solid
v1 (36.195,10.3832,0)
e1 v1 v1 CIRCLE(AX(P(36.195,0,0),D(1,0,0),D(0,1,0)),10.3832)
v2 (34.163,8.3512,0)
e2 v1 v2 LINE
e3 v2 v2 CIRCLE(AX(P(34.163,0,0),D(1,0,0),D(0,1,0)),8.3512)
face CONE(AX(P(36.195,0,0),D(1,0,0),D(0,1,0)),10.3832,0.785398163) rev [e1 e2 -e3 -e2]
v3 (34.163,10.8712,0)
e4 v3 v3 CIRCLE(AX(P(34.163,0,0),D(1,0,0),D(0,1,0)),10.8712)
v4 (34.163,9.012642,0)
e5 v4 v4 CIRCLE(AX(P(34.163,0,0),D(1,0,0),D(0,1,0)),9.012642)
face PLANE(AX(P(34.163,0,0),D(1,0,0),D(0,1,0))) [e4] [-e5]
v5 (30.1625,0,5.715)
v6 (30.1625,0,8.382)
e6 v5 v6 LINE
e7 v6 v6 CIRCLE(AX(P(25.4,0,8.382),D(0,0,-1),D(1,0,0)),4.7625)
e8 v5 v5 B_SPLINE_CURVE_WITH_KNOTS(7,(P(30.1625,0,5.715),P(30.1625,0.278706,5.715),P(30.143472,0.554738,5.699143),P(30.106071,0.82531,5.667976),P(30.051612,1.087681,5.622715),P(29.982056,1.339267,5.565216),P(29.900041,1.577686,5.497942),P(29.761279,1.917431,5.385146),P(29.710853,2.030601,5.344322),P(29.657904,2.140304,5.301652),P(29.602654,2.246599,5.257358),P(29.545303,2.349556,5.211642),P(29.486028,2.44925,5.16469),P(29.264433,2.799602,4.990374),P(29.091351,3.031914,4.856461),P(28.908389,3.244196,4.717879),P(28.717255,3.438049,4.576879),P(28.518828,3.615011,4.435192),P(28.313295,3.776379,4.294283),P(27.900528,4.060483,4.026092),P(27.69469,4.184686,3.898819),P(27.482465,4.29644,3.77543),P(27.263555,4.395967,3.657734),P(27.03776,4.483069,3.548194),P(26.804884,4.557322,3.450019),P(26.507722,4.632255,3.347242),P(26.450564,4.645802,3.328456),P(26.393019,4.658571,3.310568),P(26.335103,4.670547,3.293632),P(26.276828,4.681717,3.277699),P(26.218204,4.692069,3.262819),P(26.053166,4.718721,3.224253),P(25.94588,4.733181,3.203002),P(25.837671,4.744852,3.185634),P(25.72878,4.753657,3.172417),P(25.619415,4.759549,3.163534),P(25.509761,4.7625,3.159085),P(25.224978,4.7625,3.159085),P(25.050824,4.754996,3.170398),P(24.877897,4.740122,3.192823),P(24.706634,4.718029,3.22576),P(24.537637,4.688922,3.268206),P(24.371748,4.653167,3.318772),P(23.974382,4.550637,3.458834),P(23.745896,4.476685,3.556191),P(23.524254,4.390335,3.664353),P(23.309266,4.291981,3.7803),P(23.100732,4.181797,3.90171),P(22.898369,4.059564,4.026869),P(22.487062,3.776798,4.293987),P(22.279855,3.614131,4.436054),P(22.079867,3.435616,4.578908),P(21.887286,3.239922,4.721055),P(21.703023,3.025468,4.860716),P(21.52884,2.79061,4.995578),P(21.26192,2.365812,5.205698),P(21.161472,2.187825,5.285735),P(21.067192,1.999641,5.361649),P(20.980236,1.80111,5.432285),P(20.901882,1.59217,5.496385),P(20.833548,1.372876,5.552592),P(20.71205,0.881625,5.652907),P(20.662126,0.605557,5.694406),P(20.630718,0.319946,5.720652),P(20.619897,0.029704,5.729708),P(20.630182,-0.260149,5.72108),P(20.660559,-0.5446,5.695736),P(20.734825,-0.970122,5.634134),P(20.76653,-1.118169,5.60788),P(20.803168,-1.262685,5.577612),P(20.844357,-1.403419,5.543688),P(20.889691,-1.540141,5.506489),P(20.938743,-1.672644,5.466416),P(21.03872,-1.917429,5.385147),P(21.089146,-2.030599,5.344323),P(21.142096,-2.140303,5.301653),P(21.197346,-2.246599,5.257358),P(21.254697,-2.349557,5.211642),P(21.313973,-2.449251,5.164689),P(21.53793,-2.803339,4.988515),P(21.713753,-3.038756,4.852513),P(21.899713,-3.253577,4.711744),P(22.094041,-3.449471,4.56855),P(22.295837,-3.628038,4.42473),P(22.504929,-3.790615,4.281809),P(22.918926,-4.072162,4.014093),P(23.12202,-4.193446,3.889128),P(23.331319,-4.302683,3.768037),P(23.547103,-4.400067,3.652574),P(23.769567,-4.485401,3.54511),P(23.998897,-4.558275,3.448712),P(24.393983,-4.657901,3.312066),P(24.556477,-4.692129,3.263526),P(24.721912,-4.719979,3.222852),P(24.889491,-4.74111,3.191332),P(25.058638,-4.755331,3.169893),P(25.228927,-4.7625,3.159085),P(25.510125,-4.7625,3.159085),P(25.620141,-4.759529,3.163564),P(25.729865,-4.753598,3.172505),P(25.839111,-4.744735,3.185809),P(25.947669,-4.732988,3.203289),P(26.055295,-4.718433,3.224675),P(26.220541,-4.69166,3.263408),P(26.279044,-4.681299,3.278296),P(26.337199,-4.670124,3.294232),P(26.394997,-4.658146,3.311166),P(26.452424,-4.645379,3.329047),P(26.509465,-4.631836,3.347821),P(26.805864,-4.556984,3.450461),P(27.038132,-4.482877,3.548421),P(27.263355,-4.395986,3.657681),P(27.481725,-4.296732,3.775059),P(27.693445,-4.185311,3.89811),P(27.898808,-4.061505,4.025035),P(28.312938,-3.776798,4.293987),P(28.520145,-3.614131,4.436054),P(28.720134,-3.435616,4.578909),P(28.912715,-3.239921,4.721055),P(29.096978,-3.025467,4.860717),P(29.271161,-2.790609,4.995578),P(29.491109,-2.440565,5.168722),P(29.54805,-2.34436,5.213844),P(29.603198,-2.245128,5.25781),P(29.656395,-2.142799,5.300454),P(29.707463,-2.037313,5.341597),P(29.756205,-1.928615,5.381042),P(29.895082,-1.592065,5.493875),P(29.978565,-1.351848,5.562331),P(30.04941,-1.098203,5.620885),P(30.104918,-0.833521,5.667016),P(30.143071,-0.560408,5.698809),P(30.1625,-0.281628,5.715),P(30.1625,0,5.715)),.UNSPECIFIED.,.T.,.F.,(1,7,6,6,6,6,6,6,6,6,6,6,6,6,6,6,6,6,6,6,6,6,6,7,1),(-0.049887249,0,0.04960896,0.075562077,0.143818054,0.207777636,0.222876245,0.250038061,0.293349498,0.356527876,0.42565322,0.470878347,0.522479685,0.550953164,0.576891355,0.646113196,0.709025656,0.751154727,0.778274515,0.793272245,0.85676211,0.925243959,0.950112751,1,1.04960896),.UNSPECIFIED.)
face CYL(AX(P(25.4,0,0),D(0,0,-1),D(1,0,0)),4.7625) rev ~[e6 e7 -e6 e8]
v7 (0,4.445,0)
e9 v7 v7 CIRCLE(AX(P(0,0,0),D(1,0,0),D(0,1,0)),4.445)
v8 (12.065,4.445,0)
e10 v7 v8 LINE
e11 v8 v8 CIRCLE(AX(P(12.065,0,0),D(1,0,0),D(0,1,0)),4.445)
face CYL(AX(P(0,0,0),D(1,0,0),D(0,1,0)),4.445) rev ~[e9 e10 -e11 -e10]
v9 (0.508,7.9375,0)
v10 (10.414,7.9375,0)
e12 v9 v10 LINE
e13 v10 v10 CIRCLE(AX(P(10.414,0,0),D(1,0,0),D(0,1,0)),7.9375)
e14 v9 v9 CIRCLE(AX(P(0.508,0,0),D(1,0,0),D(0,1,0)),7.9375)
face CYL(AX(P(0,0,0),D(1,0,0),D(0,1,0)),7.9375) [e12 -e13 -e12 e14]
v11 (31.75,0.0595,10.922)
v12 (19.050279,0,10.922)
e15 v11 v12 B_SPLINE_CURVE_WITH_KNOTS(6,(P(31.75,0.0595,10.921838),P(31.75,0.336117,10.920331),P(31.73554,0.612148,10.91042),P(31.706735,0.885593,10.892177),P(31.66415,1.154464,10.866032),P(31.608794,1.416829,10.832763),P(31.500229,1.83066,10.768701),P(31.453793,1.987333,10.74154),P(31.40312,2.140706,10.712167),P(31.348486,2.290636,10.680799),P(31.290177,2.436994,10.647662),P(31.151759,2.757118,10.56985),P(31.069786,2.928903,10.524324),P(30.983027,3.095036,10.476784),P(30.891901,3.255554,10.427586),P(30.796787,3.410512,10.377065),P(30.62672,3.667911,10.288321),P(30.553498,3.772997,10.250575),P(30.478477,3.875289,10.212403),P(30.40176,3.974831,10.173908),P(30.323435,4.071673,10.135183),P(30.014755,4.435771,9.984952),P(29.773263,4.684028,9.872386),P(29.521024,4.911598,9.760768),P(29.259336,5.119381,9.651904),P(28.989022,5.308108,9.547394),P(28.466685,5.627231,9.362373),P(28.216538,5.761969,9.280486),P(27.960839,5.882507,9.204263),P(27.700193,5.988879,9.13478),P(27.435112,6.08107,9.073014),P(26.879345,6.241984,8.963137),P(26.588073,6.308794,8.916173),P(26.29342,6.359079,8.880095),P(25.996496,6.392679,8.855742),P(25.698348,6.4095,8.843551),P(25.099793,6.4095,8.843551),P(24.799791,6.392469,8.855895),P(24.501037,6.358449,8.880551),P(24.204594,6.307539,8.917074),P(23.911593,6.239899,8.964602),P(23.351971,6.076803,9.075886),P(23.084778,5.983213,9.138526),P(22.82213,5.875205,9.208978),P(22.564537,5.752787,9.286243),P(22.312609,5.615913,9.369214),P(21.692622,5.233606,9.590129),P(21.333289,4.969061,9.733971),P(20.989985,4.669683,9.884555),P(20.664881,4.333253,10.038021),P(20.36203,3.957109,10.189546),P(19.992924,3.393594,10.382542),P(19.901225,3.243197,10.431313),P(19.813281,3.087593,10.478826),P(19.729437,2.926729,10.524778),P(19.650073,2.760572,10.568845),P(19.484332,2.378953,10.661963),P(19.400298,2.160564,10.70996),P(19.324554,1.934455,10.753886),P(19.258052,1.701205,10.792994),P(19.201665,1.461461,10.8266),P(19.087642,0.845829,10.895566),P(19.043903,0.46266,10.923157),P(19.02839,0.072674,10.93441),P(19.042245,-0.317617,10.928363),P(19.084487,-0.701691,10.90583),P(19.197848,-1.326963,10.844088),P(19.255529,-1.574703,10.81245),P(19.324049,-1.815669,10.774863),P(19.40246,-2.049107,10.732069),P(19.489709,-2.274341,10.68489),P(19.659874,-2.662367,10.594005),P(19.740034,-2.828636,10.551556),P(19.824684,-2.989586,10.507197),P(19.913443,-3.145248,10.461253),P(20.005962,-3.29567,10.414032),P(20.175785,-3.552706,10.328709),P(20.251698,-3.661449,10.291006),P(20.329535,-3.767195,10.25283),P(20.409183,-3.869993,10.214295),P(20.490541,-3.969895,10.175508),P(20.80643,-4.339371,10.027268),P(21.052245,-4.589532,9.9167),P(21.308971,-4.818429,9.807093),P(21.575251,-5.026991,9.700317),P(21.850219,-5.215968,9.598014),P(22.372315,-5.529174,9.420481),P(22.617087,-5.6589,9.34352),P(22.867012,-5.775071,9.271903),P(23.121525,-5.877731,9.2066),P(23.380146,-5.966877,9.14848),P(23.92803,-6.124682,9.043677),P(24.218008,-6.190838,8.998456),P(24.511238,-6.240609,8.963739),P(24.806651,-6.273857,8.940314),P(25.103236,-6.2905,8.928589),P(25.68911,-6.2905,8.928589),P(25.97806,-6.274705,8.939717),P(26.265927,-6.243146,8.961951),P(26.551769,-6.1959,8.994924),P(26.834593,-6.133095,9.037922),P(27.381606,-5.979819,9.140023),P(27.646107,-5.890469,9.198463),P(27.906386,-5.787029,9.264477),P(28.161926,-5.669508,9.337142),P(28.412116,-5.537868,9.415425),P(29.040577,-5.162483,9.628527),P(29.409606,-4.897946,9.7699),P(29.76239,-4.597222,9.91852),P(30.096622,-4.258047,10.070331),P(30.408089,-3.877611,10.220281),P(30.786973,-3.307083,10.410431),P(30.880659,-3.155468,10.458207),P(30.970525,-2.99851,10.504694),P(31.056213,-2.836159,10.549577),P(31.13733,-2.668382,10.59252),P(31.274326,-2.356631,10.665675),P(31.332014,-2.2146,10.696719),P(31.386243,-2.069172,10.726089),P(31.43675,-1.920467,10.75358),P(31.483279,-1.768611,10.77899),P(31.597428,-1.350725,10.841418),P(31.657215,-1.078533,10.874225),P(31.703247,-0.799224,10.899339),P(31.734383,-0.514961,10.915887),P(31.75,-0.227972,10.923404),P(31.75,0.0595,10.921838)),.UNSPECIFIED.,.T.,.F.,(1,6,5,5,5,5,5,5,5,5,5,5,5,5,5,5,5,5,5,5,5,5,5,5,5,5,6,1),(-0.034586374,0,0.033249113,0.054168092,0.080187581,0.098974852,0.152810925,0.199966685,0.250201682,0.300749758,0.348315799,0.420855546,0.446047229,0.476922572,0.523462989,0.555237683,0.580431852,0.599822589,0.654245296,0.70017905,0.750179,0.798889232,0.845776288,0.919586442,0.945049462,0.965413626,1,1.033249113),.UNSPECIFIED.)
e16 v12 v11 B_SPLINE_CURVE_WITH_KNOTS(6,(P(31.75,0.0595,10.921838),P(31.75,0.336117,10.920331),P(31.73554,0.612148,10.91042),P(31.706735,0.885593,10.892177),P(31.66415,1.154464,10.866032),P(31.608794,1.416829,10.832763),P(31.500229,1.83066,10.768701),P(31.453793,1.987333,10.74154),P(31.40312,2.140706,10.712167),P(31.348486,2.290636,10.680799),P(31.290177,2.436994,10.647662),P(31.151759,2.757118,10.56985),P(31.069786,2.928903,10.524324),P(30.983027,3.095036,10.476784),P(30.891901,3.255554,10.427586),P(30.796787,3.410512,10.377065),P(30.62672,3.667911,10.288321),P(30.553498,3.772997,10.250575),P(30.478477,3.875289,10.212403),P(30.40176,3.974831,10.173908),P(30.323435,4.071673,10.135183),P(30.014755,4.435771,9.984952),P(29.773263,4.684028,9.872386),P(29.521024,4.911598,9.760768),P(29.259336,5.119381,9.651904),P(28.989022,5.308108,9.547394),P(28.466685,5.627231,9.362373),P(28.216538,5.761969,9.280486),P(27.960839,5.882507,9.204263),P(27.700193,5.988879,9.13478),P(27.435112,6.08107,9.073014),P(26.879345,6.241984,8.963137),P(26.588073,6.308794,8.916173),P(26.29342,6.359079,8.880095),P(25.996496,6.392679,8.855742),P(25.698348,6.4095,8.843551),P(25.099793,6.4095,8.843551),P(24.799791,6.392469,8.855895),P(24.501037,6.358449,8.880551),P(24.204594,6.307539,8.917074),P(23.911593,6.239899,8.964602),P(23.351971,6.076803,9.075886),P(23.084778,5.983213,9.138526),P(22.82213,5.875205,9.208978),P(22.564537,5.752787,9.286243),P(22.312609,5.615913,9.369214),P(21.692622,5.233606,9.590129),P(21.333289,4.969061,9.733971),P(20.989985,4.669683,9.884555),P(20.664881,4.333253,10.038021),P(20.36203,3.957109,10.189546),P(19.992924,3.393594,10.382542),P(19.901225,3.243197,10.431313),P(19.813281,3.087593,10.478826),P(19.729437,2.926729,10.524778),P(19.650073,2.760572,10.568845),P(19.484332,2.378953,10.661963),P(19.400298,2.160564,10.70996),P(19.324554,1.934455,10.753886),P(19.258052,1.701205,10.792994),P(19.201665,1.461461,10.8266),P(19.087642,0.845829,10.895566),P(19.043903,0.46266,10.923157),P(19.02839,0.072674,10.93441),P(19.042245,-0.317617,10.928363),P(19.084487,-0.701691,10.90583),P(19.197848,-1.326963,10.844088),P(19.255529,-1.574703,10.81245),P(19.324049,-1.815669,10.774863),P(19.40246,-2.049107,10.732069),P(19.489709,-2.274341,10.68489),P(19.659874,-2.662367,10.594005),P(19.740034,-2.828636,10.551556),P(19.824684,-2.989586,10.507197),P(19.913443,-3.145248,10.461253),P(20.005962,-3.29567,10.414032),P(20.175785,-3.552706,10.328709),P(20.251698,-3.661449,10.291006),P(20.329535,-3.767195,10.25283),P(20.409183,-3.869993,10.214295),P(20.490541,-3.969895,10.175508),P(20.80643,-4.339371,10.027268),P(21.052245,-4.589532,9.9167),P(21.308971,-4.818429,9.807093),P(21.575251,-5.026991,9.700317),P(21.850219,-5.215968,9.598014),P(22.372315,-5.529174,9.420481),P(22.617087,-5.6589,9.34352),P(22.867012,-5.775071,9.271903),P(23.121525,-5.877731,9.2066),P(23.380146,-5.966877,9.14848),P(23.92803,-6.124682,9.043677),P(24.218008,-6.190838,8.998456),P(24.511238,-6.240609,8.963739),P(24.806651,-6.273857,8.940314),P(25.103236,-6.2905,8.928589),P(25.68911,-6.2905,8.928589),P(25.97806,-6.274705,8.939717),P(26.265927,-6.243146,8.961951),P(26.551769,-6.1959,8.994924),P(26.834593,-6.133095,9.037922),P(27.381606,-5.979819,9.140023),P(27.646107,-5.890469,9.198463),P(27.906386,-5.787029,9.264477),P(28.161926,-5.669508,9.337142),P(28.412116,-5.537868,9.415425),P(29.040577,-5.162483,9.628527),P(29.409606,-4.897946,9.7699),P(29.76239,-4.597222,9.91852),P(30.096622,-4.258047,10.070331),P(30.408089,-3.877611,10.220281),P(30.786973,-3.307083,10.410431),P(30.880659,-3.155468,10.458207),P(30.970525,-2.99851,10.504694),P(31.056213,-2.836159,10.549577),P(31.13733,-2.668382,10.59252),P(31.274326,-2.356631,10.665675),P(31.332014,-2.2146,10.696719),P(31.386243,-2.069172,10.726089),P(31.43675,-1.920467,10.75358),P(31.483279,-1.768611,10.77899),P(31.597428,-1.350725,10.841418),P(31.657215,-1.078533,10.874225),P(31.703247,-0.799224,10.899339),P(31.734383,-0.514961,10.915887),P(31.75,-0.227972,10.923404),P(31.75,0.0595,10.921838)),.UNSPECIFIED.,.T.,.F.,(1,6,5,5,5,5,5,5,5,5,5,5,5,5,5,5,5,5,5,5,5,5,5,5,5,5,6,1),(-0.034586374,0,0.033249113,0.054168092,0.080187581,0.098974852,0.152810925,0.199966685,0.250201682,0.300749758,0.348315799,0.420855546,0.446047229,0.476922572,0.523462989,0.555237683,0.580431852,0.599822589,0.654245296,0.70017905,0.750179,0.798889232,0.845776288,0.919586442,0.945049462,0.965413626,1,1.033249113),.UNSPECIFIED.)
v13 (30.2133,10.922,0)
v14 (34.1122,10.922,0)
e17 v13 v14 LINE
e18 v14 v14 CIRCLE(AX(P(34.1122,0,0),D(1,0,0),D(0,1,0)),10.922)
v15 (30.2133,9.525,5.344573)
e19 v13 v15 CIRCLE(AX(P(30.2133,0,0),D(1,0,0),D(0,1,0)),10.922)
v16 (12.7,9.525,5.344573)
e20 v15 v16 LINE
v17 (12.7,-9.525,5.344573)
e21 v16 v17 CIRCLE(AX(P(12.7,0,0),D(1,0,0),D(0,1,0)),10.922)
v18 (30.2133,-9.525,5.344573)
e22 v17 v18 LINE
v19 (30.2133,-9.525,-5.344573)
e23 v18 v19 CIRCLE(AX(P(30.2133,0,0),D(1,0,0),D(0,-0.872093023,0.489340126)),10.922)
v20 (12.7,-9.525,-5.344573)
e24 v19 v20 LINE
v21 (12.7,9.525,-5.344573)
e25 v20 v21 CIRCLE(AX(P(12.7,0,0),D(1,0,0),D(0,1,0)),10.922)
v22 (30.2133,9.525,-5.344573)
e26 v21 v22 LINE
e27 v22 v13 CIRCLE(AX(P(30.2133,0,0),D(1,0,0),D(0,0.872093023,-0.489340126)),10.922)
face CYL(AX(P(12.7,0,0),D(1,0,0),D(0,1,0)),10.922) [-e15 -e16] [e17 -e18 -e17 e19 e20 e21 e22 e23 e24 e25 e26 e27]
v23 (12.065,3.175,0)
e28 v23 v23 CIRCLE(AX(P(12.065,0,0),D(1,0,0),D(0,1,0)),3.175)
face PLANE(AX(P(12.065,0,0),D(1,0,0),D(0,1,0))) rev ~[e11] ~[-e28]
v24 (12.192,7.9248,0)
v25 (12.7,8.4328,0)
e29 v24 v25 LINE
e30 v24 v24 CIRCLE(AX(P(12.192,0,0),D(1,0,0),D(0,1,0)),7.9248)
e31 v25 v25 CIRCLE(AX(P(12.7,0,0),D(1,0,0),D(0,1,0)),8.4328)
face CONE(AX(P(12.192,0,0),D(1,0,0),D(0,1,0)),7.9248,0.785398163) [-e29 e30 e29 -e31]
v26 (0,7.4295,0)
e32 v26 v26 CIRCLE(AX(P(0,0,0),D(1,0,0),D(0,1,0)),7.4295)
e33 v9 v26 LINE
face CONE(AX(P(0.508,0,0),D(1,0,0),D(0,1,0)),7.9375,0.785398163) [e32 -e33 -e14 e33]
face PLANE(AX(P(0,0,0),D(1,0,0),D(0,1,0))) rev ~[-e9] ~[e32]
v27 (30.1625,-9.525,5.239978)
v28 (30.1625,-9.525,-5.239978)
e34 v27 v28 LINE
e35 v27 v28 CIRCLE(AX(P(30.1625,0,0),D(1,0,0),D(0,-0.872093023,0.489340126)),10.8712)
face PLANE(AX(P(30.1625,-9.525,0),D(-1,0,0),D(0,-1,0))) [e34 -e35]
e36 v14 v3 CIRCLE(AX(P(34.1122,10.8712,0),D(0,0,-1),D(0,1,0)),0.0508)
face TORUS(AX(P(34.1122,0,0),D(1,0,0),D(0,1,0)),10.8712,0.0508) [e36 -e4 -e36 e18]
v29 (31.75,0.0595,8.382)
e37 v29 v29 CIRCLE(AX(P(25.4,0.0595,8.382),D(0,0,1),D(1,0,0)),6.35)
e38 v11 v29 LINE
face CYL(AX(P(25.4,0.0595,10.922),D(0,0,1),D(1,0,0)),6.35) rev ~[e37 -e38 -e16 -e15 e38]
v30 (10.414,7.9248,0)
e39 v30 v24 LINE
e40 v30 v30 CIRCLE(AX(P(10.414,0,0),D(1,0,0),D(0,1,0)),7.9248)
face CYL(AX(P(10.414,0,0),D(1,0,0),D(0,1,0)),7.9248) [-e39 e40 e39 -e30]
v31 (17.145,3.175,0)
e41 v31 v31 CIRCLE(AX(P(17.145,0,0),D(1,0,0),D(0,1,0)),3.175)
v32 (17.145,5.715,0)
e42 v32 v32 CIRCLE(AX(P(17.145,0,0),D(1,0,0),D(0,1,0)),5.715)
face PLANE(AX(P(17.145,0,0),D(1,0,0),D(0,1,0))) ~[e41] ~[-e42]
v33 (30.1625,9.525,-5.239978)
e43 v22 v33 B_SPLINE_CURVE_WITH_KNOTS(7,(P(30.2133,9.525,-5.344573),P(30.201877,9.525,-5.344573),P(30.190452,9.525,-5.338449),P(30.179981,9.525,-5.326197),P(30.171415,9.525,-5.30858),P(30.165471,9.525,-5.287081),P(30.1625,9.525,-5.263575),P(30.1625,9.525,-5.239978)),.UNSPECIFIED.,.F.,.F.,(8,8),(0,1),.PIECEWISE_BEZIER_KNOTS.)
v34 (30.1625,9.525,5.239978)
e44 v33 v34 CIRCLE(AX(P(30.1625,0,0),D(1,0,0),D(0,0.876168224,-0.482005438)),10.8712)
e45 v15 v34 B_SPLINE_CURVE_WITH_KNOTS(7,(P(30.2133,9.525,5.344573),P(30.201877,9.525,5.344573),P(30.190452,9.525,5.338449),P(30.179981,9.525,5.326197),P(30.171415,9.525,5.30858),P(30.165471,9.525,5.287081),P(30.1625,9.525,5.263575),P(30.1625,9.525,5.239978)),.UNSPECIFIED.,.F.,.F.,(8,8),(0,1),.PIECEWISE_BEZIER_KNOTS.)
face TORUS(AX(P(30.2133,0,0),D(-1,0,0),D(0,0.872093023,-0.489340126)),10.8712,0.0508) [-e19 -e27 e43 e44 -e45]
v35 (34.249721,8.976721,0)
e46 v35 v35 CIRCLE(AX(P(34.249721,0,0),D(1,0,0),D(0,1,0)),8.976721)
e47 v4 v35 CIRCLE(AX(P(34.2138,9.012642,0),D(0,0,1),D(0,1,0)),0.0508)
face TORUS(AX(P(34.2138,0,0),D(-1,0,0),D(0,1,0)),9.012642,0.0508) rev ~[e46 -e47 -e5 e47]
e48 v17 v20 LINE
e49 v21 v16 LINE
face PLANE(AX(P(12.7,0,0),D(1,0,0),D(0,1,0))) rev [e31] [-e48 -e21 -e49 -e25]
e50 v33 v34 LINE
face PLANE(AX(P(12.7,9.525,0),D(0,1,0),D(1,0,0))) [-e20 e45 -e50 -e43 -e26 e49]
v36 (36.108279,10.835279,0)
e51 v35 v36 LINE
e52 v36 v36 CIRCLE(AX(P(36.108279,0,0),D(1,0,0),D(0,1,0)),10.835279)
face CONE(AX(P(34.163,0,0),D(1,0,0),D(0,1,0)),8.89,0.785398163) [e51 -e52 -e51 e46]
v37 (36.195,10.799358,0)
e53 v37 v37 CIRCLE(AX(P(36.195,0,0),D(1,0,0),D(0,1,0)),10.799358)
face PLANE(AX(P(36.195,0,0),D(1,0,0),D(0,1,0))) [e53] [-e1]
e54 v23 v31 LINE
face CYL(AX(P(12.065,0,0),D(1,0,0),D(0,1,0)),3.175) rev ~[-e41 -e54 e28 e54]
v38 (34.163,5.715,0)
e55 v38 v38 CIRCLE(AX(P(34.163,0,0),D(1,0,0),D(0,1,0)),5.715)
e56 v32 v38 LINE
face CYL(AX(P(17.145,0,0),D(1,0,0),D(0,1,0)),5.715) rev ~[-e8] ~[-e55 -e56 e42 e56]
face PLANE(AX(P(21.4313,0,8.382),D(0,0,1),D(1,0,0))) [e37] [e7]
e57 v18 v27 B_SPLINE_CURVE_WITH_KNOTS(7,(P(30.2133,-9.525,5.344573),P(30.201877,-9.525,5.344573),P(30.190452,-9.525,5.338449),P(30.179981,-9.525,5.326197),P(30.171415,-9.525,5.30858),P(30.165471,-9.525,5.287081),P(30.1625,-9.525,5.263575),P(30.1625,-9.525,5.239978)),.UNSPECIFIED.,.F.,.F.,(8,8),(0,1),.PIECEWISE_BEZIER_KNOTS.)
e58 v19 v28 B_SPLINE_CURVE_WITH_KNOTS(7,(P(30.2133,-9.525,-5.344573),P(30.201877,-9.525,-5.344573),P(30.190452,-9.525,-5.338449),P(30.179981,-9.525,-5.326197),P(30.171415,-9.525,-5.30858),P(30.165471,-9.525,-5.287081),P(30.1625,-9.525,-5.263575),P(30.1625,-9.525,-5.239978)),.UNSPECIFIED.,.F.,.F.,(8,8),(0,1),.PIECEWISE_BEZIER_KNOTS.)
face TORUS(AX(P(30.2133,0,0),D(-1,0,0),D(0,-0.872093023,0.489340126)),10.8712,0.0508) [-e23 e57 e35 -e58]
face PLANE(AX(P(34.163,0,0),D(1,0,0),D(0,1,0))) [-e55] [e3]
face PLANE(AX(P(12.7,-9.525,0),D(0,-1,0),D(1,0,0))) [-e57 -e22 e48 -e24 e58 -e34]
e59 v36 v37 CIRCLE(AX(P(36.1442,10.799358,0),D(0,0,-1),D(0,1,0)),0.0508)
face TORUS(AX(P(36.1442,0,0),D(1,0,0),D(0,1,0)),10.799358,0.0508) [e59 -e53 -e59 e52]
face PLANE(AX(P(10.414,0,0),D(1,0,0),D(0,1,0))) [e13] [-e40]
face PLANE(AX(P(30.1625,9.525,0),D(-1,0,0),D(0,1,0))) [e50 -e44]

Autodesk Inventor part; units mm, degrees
ref_plane "YZ Plane" through (0, 0, 0) normal (1, 0, 0) x (0, 1, 0)
ref_plane "XZ Plane" through (0, 0, 0) normal (0, 1, 0) x (-1, 0, 0)
sketch "Sketch1" plane through (0, 0, 0) normal (0, 0, 1) x (1, 0, 0)
  line L0 (0, 0) -> (36.195, 0)
  line L1 (0, 7.9375) -> (10.414, 7.9375)
  line L2 (10.414, 7.9375) -> (10.414, 7.9248)
  line L3 (10.414, 7.9248) -> (12.7, 7.9248)
  line L4 (12.7, 7.9248) -> (12.7, 9.525)
  line L5 (12.7, 9.525) -> (30.1625, 9.525)
  line L6 (30.1625, 9.525) -> (30.1625, 10.922)
  line L7 (30.1625, 10.922) -> (34.163, 10.922)
  line L8 (34.163, 10.922) -> (34.163, 8.89)
  line L9 (34.163, 8.89) -> (36.195, 10.922)
  line L10 (36.195, 10.922) -> (36.195, 5.715)
  line L11 (0, 7.9375) -> (0, 4.445)
  line L12 (0, 3.175) -> (12.065, 3.175)
  line L13 (36.195, 5.715) -> (36.195, 0) construction
  line L14 (0, 3.175) -> (0, 0) construction
  line L15 (34.163, 10.922) -> (36.195, 10.922) construction
  line L16 (30.1625, 8.89) -> (34.163, 8.89) construction
  line L17 (12.7, 9.525) -> (12.7, 10.922)
  line L18 (12.7, 10.922) -> (30.1625, 10.922)
  circle A0 centre (25.4, 0) radius 4.7625
  line L19 (17.145, 3.175) -> (17.145, 5.715)
  line L20 (17.145, 5.715) -> (34.163, 5.715)
  line L21 (36.195, 10.3832) -> (34.163, 8.3512)
  line L22 (34.163, 8.3512) -> (34.163, 5.715)
  line L23 (34.163, 8.89) -> (34.163, 8.3512) construction
  line L24 (34.163, 5.715) -> (36.195, 5.715) construction
  line L25 (0, 4.445) -> (12.065, 4.445)
  line L26 (12.065, 4.445) -> (12.065, 3.175)
  line L27 (12.065, 3.175) -> (17.145, 3.175)
  line L28 (0, 4.445) -> (0, 3.175)
  dimension "d0" = 17.4625
  dimension "d2" = 15.8496
  dimension "d3" = 15.875
  dimension "d4" = 2.286
  dimension "d5" = 12.7
  dimension "d6" = 6.35
  dimension "d7" = 19.05
  dimension "d8" = 21.844
  dimension "d9" = 17.78
  dimension "d10" = 45
  dimension "d11" = 36.195
  dimension "d23" = 9.525
  dimension "d24" = 25.4
  dimension "d34" = 11.43
  dimension "d35" = 19.05
  dimension "d36" = 0.381
  dimension "d45" = 12.065
  dimension "d46" = 8.89
revolve "Revolution1" add sketch "Sketch1" angle 360 about axis through (0, 0, 0) along (1, 0, 0) contours L1 L2 L3 L4 L5 L6 L7 L8 L9 L10 L21 L22 L20 L19 L27 L26 L25 L11 | L17 L18 L6 L5
extrude "Extrusion1" cut sketch "Sketch1" along normal through all both and the other way through all contours L17 L18 L6 L5
extrude "Extrusion2" cut sketch "Sketch1" along normal through all contours A0 L0 | L0 A0
thread "Thread1" size "5/8-18 UNF" class "2A" standard "ANSI Unified Screw Threads" full length
chamfer "Chamfer1" distance 0.508 angle 45 2 edges at (12.7, -7.9248, 0) (0, -7.9375, 0)
chamfer "Chamfer2" distance 0.762 angle 45 1 edges at (20.6375, 0.0005, 10.922)
pattern_circular "Circular Pattern1" count 2 over 360 about axis through (21.4313, 0, 0) along (1, 0, 0) of "Extrusion1"
thread "Thread3" size "1/8" designation "1/8 - 27 NPT" standard "NPT" length 9.9568
fillet "Fillet1" radius 0.0508 6 edges at (36.195, -10.922, 0) (34.163, -8.89, 0) (34.163, -10.922, 0) (30.1625, 10.567, 2.7621) (30.1625, 10.567, -2.7621) (30.1625, -10.922, 0)
ref_plane "Work Plane1" through (21.4313, 0, 10.922) normal (0, 0, 1) x (1, 0, 0)
sketch "Sketch2" plane through (21.4313, 0, 10.922) normal (0, 0, 1) x (1, 0, 0)
  circle A0 centre (3.9687, 0.0595) radius 6.35
  line L0 (3.9687, 0.0595) -> (3.9687, -4.7625) construction
  point P0 (-21.4313, 0)
  dimension "d41" = 12.7
  dimension "d44" = 4.822
extrude "Extrusion4" cut sketch "Sketch2" against normal blind 2.54
properties part number "Rebuild Shooter NCDME075-0600 Cylinder Front Section" material "Aluminum 6061"
